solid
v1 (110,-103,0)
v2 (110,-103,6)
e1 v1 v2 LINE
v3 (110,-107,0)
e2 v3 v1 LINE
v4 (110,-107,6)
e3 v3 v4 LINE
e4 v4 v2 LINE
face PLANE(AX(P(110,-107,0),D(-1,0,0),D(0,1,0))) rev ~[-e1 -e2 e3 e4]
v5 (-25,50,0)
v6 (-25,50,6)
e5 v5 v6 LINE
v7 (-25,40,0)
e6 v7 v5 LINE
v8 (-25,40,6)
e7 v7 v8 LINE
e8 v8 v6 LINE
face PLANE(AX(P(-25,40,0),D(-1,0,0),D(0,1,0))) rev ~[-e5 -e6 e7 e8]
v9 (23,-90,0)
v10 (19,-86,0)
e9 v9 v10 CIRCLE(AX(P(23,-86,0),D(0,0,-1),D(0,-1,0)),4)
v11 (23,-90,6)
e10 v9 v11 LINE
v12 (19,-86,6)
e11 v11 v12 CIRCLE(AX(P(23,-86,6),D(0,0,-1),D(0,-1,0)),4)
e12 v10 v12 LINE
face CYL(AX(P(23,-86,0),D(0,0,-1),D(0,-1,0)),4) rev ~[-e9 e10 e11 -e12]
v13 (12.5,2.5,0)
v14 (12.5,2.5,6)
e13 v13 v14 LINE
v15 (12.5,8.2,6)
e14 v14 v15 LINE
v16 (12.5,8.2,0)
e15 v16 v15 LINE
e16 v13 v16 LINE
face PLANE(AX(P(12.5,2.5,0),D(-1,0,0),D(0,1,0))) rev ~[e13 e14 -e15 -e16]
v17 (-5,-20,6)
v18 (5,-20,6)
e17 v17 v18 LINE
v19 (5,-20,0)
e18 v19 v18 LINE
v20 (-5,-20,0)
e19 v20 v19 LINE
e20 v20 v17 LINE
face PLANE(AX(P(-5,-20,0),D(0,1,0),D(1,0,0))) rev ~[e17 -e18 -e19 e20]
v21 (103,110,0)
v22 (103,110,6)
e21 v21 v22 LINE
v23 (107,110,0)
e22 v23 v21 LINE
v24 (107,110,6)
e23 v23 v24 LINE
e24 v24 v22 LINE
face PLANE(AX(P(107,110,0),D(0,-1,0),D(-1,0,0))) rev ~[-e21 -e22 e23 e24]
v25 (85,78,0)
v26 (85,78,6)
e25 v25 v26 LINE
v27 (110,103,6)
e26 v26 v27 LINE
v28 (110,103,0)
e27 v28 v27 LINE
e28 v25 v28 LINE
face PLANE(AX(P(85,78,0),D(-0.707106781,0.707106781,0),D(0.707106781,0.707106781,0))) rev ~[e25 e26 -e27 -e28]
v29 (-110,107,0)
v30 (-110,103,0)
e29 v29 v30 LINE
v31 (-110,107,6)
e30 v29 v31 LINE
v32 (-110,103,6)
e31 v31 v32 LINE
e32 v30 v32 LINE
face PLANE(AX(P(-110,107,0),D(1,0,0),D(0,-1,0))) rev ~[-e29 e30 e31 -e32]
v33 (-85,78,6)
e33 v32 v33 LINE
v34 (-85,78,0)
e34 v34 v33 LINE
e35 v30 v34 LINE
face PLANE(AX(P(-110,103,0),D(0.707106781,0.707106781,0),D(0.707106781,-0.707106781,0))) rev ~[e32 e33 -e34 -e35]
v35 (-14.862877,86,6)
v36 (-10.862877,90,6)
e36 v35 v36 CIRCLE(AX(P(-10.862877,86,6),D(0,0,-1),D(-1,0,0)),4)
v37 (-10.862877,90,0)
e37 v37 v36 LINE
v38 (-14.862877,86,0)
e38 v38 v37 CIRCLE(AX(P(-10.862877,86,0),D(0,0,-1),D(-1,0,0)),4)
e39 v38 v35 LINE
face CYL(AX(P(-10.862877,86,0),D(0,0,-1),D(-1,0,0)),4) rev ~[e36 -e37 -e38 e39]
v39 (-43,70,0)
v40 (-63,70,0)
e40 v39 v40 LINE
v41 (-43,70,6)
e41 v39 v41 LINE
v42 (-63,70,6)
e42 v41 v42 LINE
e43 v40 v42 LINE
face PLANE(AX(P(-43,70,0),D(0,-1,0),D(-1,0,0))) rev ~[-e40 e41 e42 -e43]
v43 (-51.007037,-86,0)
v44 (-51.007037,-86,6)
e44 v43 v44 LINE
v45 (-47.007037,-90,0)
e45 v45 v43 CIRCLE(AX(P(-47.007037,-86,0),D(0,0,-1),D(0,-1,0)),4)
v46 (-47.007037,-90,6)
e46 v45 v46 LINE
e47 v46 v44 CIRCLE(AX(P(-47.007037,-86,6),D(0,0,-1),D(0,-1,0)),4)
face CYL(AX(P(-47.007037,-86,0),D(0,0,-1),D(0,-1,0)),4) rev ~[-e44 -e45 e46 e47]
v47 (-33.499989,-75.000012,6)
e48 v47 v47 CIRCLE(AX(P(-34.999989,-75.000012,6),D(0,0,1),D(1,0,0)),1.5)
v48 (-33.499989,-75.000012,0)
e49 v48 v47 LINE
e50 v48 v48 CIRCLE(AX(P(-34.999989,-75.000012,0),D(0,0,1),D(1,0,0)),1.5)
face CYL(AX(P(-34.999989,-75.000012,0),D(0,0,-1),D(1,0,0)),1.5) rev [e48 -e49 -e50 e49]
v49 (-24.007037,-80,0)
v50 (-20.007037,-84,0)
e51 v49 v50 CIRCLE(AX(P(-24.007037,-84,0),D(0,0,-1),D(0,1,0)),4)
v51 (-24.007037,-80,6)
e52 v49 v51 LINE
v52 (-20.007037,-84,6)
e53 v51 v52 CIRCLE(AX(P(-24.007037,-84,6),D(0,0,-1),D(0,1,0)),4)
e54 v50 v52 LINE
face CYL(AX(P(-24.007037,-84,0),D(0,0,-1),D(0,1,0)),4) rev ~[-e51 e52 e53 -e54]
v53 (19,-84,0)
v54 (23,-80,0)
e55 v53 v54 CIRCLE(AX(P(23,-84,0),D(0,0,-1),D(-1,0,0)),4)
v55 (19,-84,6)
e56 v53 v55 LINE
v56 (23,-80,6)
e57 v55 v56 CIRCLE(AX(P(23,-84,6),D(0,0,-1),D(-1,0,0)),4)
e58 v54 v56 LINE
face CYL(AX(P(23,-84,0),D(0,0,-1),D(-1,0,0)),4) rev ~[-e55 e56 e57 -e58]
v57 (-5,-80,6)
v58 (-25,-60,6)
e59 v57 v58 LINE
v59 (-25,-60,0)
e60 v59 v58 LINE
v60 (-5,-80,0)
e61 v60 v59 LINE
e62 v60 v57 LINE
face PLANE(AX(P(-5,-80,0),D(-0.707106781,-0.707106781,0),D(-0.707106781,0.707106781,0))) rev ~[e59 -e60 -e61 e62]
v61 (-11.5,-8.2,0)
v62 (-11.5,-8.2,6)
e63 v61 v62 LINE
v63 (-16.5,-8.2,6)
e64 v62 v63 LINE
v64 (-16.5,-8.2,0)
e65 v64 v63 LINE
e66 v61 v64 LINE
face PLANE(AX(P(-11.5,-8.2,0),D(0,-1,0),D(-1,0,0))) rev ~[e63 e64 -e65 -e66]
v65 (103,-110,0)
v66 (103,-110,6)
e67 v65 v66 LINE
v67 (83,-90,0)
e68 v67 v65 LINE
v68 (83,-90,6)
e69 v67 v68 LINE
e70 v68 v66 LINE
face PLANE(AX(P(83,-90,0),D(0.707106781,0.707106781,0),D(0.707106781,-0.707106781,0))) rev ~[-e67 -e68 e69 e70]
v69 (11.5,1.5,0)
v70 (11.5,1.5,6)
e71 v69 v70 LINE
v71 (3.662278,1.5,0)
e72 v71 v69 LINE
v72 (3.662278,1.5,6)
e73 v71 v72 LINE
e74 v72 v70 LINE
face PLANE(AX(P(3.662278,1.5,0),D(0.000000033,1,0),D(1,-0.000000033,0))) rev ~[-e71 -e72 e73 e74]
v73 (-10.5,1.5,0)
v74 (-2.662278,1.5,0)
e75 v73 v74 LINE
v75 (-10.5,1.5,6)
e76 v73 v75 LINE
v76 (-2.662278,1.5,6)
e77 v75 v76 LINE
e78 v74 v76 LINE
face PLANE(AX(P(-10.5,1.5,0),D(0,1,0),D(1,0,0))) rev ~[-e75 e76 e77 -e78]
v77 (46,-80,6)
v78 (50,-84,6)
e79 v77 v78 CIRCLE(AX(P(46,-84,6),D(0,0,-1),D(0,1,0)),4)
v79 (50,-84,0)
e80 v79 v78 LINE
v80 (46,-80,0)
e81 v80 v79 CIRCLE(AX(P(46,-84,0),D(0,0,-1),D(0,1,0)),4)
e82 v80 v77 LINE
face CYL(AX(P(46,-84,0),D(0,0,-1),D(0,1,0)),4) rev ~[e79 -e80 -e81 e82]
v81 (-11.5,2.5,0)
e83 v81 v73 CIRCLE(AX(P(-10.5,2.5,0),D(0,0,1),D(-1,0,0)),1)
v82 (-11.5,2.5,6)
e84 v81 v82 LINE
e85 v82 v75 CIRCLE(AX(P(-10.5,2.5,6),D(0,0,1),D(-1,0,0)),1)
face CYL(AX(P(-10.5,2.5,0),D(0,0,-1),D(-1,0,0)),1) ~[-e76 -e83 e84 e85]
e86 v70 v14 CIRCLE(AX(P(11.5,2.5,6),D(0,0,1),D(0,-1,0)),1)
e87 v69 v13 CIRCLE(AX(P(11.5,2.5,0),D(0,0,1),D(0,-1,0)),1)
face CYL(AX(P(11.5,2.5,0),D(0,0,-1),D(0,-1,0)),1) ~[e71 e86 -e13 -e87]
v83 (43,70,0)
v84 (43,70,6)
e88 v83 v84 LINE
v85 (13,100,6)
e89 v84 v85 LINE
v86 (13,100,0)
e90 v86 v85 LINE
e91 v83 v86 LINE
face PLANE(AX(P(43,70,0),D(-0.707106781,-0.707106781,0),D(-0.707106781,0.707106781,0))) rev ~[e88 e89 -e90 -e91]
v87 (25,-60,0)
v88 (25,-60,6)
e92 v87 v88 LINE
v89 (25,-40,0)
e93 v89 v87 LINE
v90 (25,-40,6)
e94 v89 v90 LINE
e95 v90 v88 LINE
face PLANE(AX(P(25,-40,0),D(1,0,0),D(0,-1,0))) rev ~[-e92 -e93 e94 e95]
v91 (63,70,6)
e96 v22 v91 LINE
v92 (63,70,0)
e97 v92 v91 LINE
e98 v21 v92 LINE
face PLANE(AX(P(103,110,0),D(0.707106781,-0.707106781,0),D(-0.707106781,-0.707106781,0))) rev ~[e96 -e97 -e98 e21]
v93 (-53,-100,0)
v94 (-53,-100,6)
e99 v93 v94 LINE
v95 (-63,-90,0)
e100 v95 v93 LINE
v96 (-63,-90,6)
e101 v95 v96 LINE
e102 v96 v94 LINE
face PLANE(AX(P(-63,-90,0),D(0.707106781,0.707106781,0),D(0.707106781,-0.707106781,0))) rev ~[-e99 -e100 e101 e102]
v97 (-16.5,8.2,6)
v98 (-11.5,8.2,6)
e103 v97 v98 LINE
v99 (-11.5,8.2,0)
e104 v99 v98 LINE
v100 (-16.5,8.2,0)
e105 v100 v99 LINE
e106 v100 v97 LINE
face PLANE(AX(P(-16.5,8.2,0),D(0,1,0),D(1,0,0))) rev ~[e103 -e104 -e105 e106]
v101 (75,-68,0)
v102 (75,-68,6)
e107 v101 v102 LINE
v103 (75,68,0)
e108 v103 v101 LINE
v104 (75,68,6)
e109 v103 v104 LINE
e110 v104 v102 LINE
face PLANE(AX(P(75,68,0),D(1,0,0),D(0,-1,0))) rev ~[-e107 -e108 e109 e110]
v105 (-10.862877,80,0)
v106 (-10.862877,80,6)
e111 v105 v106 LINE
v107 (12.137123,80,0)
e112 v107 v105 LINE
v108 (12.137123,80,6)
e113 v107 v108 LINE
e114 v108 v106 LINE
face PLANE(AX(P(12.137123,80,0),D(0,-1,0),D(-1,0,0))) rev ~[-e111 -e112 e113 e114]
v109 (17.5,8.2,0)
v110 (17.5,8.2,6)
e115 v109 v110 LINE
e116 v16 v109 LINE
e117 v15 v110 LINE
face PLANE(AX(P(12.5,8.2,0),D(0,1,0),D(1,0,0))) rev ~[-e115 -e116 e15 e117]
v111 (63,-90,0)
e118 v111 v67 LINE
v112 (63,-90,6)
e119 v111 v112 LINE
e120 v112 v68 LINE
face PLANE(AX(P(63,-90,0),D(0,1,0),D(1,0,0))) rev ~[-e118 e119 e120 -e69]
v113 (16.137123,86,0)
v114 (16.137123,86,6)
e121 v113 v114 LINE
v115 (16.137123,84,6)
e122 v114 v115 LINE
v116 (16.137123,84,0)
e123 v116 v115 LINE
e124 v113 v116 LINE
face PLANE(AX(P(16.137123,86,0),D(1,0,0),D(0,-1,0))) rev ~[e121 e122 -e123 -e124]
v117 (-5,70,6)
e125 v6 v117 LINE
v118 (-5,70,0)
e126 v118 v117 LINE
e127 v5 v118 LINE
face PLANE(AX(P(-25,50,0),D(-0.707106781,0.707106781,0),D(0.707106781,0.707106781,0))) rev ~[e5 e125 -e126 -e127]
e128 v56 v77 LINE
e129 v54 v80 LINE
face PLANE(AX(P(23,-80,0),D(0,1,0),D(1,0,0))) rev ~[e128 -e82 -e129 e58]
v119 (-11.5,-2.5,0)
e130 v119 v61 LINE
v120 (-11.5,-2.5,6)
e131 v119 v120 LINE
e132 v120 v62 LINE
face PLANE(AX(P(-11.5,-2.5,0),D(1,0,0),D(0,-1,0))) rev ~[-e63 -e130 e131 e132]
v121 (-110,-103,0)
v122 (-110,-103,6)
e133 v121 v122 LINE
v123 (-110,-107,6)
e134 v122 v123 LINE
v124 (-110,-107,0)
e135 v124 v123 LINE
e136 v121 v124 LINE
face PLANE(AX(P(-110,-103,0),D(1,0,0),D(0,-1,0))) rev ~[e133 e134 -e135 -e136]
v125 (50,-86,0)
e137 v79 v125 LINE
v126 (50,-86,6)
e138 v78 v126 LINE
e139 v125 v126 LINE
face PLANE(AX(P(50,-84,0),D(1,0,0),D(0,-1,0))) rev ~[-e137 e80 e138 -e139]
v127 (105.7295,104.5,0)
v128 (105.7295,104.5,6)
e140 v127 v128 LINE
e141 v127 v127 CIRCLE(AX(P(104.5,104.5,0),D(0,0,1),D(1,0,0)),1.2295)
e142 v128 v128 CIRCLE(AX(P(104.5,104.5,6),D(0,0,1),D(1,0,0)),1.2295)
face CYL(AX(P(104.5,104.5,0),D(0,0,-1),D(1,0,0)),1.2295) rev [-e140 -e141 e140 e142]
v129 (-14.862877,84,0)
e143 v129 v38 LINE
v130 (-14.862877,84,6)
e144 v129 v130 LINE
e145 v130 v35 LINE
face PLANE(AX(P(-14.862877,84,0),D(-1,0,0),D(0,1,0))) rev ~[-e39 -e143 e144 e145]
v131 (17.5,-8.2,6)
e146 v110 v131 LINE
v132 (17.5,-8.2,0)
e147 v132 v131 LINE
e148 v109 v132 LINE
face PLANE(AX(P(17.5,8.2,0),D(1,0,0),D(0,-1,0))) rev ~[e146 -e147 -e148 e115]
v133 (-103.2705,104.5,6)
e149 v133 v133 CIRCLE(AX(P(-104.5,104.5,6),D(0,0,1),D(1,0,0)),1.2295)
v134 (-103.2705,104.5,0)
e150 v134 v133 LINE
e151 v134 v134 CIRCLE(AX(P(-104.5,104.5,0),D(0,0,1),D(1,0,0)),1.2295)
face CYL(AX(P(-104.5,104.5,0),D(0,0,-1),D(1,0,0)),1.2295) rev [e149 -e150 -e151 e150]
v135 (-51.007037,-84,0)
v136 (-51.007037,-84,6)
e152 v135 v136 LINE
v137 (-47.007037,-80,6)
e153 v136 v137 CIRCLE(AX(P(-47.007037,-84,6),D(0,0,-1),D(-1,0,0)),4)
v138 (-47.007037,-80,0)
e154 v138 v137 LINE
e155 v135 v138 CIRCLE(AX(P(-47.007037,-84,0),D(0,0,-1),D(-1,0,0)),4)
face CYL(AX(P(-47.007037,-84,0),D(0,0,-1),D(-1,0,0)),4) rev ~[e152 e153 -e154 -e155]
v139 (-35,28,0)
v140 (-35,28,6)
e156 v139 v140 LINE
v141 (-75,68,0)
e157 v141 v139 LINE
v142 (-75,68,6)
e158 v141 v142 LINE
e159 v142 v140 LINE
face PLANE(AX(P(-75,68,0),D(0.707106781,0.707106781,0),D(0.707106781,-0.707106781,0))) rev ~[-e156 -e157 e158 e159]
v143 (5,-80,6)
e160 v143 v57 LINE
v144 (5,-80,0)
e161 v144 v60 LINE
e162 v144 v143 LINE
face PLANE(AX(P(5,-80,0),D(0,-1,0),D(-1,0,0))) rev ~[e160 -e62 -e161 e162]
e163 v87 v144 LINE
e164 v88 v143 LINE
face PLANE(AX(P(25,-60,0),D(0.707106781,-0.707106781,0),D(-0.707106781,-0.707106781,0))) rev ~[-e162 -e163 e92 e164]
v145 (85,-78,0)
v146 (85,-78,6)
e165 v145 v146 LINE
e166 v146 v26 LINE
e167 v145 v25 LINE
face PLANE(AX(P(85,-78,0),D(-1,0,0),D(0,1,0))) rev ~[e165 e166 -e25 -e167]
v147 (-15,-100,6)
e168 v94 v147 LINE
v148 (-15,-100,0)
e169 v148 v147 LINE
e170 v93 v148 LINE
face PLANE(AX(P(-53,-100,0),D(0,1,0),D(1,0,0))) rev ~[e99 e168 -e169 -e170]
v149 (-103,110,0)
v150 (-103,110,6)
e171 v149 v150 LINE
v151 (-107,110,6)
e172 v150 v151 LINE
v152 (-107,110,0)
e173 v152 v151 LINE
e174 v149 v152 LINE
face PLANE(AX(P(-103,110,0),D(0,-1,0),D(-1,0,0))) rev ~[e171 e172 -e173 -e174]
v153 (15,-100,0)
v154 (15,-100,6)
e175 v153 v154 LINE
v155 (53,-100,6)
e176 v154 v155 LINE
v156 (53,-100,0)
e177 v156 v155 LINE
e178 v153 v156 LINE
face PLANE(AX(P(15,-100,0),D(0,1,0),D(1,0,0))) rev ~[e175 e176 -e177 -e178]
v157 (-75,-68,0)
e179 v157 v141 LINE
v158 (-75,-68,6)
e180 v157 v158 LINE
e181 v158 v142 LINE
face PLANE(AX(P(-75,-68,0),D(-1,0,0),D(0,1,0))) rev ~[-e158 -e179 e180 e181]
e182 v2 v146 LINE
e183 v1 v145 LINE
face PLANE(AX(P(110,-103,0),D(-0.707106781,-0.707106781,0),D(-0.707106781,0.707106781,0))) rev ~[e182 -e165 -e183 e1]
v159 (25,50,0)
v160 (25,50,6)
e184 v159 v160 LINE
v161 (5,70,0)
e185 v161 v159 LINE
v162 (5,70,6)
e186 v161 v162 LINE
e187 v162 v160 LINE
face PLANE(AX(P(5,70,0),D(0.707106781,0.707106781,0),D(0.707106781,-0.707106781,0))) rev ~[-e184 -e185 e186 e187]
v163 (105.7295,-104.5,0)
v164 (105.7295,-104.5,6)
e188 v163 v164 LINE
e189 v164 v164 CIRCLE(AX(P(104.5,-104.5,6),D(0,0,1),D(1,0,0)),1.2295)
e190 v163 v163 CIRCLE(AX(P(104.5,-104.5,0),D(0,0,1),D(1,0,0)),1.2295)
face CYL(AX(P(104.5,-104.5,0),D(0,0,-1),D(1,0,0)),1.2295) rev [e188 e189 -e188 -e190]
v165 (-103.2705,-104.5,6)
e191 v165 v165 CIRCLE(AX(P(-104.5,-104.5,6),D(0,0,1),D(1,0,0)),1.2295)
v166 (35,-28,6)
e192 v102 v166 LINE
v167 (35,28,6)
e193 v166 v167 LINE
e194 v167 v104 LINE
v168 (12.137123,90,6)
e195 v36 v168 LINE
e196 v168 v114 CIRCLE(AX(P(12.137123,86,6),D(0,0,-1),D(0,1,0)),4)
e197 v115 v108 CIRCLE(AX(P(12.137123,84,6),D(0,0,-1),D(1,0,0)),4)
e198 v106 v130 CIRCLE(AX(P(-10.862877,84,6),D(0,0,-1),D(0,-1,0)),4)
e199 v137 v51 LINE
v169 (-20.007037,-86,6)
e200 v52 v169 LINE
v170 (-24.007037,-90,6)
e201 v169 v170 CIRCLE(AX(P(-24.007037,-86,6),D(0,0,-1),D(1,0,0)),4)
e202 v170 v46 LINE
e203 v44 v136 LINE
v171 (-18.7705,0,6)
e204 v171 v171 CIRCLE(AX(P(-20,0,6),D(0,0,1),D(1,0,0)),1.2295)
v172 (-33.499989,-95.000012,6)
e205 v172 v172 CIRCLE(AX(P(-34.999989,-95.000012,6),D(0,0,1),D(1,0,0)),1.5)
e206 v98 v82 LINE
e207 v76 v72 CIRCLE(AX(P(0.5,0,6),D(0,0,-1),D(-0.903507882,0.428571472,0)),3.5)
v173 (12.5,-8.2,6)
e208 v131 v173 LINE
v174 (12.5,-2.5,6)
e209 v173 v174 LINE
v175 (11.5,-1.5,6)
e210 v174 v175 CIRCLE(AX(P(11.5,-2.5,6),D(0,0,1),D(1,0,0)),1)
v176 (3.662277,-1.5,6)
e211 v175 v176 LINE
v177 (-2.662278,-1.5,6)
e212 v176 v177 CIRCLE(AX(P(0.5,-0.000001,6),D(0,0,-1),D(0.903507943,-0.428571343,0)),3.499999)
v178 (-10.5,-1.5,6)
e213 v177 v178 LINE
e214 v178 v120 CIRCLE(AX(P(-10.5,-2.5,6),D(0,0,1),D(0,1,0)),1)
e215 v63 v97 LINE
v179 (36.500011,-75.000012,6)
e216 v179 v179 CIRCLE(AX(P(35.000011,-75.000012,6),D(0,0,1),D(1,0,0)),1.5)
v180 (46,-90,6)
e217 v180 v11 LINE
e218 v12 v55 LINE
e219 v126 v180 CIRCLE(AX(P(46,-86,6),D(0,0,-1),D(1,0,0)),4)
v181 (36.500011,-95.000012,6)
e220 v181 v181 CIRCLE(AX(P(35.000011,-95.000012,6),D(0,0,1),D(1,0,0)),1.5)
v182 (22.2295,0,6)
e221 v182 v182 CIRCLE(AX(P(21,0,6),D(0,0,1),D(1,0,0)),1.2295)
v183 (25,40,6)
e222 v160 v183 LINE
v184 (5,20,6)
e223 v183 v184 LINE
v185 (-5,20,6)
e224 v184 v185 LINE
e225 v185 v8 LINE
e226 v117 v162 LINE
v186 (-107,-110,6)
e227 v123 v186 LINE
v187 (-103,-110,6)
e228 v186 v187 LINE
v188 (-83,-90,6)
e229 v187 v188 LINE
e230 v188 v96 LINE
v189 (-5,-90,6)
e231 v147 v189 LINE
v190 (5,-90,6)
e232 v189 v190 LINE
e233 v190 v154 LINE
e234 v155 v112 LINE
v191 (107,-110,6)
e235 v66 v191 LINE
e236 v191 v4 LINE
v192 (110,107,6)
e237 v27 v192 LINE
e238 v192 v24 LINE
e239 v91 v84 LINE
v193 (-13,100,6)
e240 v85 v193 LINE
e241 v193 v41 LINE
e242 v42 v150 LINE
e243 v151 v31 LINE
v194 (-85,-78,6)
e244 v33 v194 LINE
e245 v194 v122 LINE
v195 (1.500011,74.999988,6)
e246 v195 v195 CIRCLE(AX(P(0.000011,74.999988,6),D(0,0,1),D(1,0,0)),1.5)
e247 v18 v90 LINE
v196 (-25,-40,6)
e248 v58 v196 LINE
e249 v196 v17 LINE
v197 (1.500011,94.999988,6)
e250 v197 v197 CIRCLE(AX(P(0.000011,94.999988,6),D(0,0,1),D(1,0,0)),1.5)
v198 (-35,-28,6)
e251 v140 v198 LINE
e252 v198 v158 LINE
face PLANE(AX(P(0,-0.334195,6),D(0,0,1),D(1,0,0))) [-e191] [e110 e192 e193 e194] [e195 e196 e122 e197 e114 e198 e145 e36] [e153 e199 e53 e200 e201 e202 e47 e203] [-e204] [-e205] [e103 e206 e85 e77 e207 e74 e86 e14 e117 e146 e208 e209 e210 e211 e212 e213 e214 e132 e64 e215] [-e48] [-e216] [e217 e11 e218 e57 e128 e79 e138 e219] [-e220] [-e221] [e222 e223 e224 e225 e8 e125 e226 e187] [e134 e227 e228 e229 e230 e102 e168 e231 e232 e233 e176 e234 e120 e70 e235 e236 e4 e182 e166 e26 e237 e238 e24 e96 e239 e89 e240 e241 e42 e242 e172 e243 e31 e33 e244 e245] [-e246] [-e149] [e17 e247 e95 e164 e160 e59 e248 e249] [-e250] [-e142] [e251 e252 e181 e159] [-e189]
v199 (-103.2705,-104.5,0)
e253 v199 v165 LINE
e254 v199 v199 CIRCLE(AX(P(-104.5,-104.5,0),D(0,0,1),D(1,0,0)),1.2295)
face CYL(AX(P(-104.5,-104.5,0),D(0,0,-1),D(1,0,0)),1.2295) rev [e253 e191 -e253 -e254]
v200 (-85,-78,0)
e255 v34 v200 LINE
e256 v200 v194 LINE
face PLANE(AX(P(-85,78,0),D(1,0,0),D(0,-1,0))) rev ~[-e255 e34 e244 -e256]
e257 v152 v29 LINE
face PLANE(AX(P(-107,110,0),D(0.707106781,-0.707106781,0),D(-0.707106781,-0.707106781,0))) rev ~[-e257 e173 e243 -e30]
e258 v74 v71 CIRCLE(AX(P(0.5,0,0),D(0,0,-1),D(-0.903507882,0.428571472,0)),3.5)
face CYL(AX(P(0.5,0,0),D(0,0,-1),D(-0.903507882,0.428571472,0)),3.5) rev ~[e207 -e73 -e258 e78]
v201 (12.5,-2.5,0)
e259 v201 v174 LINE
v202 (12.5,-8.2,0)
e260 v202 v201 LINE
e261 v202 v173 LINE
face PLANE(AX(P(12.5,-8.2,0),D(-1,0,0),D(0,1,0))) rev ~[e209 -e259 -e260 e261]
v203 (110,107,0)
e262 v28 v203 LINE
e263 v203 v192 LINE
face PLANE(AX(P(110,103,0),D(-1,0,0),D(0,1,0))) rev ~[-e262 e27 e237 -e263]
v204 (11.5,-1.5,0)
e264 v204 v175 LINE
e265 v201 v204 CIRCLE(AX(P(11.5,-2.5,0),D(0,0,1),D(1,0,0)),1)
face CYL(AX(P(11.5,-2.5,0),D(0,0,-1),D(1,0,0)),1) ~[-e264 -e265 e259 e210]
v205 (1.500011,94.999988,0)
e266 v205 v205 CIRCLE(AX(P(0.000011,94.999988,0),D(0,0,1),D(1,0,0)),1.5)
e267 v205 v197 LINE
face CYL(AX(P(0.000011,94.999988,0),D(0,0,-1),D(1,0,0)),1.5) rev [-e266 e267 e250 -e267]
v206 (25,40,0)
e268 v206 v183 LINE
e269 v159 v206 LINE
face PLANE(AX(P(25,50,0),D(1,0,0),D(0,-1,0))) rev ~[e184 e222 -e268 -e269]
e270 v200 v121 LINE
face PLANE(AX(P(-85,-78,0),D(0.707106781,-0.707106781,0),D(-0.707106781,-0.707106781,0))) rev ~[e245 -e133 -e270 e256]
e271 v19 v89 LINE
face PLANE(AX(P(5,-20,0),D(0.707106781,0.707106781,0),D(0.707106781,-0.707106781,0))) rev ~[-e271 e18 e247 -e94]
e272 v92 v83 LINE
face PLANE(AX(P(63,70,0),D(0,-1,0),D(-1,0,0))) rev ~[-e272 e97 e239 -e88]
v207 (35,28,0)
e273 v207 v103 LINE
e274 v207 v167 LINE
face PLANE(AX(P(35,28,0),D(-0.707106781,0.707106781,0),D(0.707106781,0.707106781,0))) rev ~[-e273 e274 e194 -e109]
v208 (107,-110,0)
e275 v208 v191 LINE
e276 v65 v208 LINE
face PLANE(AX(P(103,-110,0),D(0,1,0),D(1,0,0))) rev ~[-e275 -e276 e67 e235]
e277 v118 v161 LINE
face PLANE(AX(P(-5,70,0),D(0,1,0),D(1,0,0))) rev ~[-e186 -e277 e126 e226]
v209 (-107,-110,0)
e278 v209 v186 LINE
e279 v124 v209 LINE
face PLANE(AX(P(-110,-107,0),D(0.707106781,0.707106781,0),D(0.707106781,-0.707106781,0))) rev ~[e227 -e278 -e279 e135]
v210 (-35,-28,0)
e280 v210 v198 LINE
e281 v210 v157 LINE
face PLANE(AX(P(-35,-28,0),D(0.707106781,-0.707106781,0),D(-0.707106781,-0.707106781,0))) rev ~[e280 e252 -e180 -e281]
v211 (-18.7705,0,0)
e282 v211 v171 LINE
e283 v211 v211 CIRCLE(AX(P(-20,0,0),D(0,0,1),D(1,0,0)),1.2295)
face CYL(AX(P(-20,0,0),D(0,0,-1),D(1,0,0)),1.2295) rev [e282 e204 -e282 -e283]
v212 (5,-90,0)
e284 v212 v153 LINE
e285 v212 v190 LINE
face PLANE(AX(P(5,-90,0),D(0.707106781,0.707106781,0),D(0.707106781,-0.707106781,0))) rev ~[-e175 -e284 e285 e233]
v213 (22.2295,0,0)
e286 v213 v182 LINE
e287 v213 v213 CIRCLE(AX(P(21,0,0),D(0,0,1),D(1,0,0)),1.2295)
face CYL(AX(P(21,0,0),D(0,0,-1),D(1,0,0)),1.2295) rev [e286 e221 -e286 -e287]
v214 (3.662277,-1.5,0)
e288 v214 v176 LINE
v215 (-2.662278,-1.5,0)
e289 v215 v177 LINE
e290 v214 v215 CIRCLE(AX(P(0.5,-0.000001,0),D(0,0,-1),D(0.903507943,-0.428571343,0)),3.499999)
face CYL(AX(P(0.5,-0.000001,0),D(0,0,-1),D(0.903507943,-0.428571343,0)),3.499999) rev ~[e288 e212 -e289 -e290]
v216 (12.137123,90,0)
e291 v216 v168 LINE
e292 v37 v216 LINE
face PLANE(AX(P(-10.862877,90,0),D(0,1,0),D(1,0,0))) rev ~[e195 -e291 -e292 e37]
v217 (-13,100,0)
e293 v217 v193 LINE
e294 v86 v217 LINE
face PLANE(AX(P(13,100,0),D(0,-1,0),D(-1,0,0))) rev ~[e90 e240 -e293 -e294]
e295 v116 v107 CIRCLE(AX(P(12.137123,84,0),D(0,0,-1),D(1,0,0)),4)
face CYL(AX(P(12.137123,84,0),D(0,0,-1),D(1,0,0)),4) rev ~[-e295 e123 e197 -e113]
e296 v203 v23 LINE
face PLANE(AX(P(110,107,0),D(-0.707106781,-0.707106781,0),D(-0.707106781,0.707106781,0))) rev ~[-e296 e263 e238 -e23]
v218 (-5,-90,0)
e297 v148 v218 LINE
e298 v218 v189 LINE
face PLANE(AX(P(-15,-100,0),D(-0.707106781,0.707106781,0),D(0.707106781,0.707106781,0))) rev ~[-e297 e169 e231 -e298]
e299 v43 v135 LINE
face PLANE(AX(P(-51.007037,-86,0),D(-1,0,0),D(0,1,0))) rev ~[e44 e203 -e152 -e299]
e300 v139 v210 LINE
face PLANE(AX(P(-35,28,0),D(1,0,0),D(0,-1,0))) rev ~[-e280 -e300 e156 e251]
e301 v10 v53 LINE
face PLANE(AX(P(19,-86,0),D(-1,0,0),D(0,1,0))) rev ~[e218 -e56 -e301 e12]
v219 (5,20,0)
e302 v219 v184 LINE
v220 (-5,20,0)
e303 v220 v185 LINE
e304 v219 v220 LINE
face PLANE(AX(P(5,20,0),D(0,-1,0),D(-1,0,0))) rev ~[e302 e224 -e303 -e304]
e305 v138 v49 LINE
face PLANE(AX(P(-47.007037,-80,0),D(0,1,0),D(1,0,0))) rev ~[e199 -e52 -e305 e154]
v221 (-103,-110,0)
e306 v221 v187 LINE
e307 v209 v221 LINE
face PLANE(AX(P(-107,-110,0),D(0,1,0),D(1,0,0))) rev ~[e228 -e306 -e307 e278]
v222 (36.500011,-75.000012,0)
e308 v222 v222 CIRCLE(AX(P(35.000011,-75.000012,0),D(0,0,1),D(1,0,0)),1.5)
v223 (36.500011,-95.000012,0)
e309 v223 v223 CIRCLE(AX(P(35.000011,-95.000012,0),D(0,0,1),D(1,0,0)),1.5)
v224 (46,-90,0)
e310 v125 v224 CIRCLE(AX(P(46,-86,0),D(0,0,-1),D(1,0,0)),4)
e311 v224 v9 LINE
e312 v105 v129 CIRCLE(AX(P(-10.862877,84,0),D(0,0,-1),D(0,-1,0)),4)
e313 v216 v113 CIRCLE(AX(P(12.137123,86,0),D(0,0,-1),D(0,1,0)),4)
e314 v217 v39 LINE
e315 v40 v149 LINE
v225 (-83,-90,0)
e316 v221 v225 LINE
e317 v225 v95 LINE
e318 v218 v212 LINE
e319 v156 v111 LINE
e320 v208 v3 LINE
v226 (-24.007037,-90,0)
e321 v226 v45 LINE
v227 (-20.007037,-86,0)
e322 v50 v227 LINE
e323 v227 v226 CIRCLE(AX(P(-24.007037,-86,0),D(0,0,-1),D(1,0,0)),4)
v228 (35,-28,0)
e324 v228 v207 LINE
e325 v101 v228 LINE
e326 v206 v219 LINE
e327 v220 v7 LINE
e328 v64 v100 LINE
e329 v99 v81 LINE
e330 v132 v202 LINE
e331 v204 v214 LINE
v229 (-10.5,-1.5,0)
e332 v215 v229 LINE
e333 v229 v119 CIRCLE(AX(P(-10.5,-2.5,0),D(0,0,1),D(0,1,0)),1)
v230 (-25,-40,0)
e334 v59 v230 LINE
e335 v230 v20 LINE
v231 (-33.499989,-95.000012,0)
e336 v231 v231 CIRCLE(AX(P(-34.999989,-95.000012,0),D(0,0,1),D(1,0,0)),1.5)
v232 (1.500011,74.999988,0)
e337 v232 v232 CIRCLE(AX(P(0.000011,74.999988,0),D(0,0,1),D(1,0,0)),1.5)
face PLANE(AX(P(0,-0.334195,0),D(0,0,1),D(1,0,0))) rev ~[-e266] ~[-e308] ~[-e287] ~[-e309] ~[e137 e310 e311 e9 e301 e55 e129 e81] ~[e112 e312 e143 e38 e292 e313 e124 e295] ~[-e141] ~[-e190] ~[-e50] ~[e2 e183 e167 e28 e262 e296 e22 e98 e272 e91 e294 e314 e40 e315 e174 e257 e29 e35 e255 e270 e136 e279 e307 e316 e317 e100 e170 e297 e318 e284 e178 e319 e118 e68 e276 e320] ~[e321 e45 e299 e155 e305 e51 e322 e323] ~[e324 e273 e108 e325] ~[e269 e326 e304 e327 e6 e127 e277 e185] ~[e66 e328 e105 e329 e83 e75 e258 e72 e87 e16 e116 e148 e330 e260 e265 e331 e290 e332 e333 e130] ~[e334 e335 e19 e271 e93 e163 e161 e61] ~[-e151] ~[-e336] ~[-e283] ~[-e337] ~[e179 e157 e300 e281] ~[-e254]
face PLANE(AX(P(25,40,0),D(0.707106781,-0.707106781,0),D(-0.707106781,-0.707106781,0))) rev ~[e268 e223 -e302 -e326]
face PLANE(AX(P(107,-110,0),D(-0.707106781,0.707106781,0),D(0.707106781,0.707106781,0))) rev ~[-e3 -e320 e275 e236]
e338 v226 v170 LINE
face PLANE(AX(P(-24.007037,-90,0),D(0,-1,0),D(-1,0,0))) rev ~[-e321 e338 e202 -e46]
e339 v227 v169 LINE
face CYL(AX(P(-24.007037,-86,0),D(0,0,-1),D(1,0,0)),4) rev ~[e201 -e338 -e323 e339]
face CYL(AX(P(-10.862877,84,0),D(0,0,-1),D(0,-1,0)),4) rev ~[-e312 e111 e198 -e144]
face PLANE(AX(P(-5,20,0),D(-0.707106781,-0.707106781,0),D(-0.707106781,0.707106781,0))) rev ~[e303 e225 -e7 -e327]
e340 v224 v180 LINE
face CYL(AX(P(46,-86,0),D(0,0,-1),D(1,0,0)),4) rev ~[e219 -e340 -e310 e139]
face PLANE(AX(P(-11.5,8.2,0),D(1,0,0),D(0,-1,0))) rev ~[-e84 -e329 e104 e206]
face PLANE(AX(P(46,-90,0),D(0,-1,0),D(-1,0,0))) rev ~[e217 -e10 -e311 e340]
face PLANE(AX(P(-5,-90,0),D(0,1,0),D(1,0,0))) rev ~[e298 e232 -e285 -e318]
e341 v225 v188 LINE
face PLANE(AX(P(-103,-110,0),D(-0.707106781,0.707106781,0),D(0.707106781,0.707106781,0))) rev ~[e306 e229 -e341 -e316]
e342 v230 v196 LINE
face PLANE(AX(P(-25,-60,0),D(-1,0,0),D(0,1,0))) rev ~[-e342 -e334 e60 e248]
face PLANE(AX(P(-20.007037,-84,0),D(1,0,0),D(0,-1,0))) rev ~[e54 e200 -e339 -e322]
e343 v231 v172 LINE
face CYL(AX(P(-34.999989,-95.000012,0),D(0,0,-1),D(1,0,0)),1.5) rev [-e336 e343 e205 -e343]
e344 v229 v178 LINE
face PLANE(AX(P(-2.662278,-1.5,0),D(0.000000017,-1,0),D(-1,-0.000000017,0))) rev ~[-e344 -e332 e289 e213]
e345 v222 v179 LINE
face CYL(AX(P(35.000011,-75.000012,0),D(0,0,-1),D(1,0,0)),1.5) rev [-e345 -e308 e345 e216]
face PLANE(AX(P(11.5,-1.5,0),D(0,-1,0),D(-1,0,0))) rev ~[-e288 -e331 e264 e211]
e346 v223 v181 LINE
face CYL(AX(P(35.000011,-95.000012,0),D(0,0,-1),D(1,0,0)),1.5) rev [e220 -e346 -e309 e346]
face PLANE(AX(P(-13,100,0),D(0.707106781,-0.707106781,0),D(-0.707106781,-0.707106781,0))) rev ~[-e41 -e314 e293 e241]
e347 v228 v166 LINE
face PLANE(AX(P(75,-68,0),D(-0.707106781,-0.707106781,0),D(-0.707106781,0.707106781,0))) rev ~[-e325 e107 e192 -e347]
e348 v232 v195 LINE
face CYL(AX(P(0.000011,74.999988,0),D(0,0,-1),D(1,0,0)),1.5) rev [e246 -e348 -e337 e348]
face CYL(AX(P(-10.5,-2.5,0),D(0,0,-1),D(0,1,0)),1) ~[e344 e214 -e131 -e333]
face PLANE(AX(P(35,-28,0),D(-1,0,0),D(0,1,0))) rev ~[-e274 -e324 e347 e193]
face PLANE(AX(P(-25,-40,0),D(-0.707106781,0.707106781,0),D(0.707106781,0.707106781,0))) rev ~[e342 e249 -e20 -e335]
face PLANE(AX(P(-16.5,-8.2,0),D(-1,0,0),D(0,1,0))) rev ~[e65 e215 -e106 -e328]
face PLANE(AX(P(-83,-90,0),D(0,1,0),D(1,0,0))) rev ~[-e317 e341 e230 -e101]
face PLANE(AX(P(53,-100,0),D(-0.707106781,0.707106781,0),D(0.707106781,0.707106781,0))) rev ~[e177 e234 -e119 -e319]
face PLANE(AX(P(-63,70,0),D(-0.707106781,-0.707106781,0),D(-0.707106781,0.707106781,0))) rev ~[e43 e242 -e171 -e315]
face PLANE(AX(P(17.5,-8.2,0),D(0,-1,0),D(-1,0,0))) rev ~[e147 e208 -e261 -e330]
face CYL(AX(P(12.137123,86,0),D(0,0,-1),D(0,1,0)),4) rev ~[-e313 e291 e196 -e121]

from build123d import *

# Parameters (mm, degrees)
F0_R     = 1.2295
F0_R_2   = 1.5
F1_DEPTH = 6


# Not quite as in the source:
# - ends of sketch curves that miss each other by under 0.0002 mm in the source are joined


with BuildPart() as f1:
    # F0 (on Top) → F1 (new body)
    with BuildSketch(Plane.XY):
        Polygon((-110, -103), (-110, -107), (-107, -110), (-103, -110), (-83, -90), (-63, -90), (-53, -100), (-15, -100), (-5, -90), (5, -90), (15, -100), (53, -100), (63, -90), (83, -90), (103, -110), (107, -110), (110, -107), (110, -103), (85, -78), (85, 78), (110, 103), (110, 107), (107, 110), (103, 110), (63, 70), (43, 70), (13, 100), (-13, 100), (-43, 70), (-63, 70), (-103, 110), (-107, 110), (-110, 107), (-110, 103), (-85, 78), (-85, -78), align=None)
        with Locations((-104.5, -104.5)):
            Circle(F0_R, mode=Mode.SUBTRACT)
        with Locations((-34.999989, -95.000012)):
            Circle(F0_R_2, mode=Mode.SUBTRACT)
        with BuildLine():
            ThreePointArc((-20.007037, -86), (-21.1786098753, -88.8284271247), (-24.007037, -90))
            Line((-24.007037, -90), (-47.007037, -90))
            ThreePointArc((-47.007037, -90), (-49.8354641247, -88.8284271247), (-51.007037, -86))
            Line((-51.007037, -86), (-51.007037, -84))
            ThreePointArc((-51.007037, -84), (-49.8354641247, -81.1715728753), (-47.007037, -80))
            Line((-47.007037, -80), (-24.007037, -80))
            ThreePointArc((-24.007037, -80), (-21.1786098753, -81.1715728753), (-20.007037, -84))
            Line((-20.007037, -84), (-20.007037, -86))
        make_face(mode=Mode.SUBTRACT)
        with Locations((-34.999989, -75.000012)):
            Circle(F0_R_2, mode=Mode.SUBTRACT)
        with Locations((35.000011, -95.000012)):
            Circle(F0_R_2, mode=Mode.SUBTRACT)
        with BuildLine():
            ThreePointArc((50, -86), (48.8284271247, -88.8284271247), (46, -90))
            Line((46, -90), (23, -90))
            ThreePointArc((23, -90), (20.1715728753, -88.8284271247), (19, -86))
            Line((19, -86), (19, -84))
            ThreePointArc((19, -84), (20.1715728753, -81.1715728753), (23, -80))
            Line((23, -80), (46, -80))
            ThreePointArc((46, -80), (48.8284271247, -81.1715728753), (50, -84))
            Line((50, -84), (50, -86))
        make_face(mode=Mode.SUBTRACT)
        with Locations((35.000011, -75.000012)):
            Circle(F0_R_2, mode=Mode.SUBTRACT)
        with Locations((104.5, -104.5)):
            Circle(F0_R, mode=Mode.SUBTRACT)
        Polygon((25, -60), (5, -80), (-5, -80), (-25, -60), (-25, -40), (-5, -20), (5, -20), (25, -40), align=None, mode=Mode.SUBTRACT)
        Polygon((-75, -68), (-75, 68), (-35, 28), (-35, -28), align=None, mode=Mode.SUBTRACT)
        with Locations((-20, 0)):
            Circle(F0_R, mode=Mode.SUBTRACT)
        with Locations((-104.5, 104.5)):
            Circle(F0_R, mode=Mode.SUBTRACT)
        with BuildLine():
            Line((-16.5, -8.2), (-16.5, 8.2))
            Line((-16.5, 8.2), (-11.5, 8.2))
            Line((-11.5, 8.2), (-11.5, 2.5))
            ThreePointArc((-11.5, 2.5), (-11.2071067812, 1.7928932188), (-10.5, 1.5))
            Line((-10.5, 1.5), (-2.662278, 1.5))
            ThreePointArc((-2.662278, 1.5), (0.4999997857, 3.5), (3.6622775389, 1.5000002556))
            Line((3.6622775389, 1.5000002556), (11.5, 1.5))
            ThreePointArc((11.5, 1.5), (12.2071067812, 1.7928932188), (12.5, 2.5))
            Line((12.5, 2.5), (12.5, 8.2))
            Line((12.5, 8.2), (17.5, 8.2))
            Line((17.5, 8.2), (17.5, -8.2))
            Line((17.5, -8.2), (12.5, -8.2))
            Line((12.5, -8.2), (12.5, -2.5))
            ThreePointArc((12.5, -2.5), (12.2071067812, -1.7928932188), (11.5, -1.5))
            Line((11.5, -1.5), (3.662277, -1.5))
            ThreePointArc((3.662277, -1.5), (0.4999997857, -3.5), (-2.6622777226, -1.4999998684))
            Line((-2.6622777226, -1.4999998684), (-10.5, -1.5))
            ThreePointArc((-10.5, -1.5), (-11.2071067812, -1.7928932188), (-11.5, -2.5))
            Line((-11.5, -2.5), (-11.5, -8.2))
            Line((-11.5, -8.2), (-16.5, -8.2))
        make_face(mode=Mode.SUBTRACT)
        with Locations((21, 0)):
            Circle(F0_R, mode=Mode.SUBTRACT)
        Polygon((-5, 20), (-25, 40), (-25, 50), (-5, 70), (5, 70), (25, 50), (25, 40), (5, 20), align=None, mode=Mode.SUBTRACT)
        Polygon((75, 68), (75, -68), (35, -28), (35, 28), align=None, mode=Mode.SUBTRACT)
        with Locations((1.1e-05, 74.999988)):
            Circle(F0_R_2, mode=Mode.SUBTRACT)
        with BuildLine():
            ThreePointArc((16.137123, 84), (14.9655501247, 81.1715728753), (12.137123, 80))
            Line((12.137123, 80), (-10.862877, 80))
            ThreePointArc((-10.862877, 80), (-13.6913041247, 81.1715728753), (-14.862877, 84))
            Line((-14.862877, 84), (-14.862877, 86))
            ThreePointArc((-14.862877, 86), (-13.6913041247, 88.8284271247), (-10.862877, 90))
            Line((-10.862877, 90), (12.137123, 90))
            ThreePointArc((12.137123, 90), (14.9655501247, 88.8284271247), (16.137123, 86))
            Line((16.137123, 86), (16.137123, 84))
        make_face(mode=Mode.SUBTRACT)
        with Locations((1.1e-05, 94.999988)):
            Circle(F0_R_2, mode=Mode.SUBTRACT)
        with Locations((104.5, 104.5)):
            Circle(F0_R, mode=Mode.SUBTRACT)
    extrude(amount=F1_DEPTH)


solid = f1.part
